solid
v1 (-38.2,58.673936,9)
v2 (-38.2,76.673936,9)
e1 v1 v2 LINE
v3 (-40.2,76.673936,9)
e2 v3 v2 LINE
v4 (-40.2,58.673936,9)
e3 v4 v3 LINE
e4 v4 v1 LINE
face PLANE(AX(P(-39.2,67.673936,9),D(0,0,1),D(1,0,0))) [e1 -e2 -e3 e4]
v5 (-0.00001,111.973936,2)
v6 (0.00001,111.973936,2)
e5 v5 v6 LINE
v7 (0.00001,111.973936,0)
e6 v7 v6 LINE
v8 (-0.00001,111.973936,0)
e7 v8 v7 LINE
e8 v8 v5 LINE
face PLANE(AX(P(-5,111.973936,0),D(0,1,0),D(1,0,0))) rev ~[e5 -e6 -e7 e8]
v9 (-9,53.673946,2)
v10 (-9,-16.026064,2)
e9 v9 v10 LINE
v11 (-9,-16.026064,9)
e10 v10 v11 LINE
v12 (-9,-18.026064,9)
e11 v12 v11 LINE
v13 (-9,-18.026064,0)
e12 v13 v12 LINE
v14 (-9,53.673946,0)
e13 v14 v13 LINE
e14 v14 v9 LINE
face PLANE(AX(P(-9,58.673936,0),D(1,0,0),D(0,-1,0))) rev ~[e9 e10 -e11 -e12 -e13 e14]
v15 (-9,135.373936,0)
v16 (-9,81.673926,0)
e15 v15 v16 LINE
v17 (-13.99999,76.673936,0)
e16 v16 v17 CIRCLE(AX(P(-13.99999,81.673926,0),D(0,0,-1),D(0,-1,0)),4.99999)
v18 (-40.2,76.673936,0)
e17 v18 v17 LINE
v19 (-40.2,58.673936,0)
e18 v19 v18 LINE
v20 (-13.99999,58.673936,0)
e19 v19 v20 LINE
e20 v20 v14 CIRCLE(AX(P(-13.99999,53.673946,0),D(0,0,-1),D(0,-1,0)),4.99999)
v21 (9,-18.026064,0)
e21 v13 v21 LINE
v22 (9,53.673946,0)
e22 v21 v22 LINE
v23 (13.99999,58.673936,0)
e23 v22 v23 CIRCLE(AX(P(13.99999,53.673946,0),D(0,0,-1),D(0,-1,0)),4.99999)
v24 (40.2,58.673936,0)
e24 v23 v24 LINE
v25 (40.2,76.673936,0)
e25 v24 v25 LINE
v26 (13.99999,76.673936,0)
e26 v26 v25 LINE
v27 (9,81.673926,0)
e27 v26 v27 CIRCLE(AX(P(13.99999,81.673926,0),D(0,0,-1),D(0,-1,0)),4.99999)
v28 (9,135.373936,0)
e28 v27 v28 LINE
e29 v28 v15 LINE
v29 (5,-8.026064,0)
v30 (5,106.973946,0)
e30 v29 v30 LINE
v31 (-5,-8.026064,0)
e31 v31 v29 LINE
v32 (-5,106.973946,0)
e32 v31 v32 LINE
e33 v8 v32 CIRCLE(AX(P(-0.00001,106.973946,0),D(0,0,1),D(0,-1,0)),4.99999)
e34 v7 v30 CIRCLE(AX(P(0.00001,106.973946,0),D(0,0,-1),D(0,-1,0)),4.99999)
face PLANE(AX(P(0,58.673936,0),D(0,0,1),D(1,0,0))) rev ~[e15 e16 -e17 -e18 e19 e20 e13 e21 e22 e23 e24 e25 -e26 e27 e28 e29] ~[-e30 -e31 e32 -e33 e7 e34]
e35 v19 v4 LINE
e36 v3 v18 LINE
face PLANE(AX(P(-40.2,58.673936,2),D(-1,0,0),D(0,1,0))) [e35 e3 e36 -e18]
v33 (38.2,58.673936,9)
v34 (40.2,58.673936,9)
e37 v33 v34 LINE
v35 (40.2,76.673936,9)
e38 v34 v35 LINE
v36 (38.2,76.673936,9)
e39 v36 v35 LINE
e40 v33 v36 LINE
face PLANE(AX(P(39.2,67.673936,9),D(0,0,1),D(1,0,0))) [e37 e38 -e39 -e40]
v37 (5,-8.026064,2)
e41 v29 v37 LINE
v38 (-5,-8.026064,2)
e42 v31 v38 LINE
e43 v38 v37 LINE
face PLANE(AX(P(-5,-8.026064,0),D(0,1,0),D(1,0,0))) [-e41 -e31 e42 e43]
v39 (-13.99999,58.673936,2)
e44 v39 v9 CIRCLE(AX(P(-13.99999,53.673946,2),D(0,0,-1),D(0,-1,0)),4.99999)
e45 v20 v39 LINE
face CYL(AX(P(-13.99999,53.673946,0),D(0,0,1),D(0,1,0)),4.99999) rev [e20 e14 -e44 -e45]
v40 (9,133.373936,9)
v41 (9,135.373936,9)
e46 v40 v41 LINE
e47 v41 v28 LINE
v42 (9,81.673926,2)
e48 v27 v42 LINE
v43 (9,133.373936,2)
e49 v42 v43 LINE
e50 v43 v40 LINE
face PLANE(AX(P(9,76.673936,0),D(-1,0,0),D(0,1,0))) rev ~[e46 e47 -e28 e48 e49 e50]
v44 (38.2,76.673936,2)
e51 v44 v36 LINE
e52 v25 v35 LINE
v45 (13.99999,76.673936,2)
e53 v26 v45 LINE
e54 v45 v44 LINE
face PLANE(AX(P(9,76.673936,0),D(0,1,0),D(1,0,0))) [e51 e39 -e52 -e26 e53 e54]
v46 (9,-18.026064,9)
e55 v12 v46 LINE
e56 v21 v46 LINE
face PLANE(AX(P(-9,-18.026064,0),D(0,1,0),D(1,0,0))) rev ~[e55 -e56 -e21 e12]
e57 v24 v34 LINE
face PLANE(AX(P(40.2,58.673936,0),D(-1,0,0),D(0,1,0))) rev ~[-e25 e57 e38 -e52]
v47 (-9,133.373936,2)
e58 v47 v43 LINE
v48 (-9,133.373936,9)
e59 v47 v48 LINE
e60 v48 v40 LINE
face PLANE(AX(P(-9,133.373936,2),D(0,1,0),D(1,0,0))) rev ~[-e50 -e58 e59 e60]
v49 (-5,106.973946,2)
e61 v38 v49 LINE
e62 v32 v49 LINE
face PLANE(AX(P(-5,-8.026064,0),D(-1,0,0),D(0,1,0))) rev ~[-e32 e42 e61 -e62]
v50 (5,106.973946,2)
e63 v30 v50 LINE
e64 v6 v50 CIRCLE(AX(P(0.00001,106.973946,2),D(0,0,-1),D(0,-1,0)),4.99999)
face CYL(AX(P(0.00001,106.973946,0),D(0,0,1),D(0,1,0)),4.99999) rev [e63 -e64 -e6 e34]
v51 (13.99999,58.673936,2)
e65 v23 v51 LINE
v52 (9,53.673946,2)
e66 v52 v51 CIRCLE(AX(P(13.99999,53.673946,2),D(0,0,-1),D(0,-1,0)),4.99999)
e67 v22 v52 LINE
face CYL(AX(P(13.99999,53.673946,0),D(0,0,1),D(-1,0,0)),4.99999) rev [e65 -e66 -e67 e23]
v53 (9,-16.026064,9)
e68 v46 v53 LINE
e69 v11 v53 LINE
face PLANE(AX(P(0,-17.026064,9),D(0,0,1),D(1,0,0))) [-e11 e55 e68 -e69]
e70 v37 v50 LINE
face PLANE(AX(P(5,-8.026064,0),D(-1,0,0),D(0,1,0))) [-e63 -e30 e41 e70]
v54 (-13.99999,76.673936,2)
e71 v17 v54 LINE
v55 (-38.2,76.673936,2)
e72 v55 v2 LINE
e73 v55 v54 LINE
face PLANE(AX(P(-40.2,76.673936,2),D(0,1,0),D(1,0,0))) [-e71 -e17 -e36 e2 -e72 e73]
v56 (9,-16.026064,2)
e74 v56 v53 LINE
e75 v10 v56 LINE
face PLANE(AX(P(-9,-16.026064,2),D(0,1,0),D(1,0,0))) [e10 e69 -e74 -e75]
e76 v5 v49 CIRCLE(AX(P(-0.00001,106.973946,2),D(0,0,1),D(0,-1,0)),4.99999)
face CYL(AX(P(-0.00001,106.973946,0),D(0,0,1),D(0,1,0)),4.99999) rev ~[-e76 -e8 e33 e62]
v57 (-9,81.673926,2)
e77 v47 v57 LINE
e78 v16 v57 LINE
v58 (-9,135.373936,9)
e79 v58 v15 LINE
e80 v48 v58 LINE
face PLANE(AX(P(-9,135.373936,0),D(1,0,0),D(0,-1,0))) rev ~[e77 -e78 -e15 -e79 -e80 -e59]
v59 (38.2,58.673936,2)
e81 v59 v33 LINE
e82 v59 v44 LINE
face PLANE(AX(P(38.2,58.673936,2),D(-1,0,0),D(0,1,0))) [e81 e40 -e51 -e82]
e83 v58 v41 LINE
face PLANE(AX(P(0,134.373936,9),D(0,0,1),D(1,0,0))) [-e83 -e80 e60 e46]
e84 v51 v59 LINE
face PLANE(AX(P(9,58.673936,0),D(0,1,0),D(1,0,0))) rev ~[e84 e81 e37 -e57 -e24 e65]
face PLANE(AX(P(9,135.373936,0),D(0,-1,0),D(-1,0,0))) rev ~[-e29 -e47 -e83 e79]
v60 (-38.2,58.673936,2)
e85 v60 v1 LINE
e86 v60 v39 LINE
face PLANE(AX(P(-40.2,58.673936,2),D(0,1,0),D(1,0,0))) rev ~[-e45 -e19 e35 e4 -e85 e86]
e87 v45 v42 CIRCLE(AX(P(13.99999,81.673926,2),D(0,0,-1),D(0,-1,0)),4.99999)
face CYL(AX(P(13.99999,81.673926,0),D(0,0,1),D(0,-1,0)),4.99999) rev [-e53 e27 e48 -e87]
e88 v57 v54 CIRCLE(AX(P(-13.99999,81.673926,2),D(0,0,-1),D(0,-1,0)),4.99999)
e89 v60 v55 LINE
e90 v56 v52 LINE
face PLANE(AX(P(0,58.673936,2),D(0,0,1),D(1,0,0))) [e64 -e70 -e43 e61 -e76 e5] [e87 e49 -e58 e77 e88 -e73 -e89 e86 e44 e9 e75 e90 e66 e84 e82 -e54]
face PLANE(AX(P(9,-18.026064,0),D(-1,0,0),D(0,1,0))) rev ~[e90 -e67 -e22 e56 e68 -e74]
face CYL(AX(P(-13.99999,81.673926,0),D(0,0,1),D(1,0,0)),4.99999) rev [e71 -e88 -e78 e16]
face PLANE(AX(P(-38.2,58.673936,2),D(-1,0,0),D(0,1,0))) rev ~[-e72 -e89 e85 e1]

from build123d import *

# Parameters (mm, degrees)
F0_W     = 10
F0_H     = 120
F0_W_2   = 31.2
F0_H_2   = 18
F1_DEPTH = 2
F3_W     = 2
F3_H     = 18
F3_W_2   = 18
F3_H_2   = 2
F4_DEPTH = 7
F5_R     = 4.99999


# Not quite as in the source:
# - a fillet or chamfer is up to 0.001 mm smaller than in the source, because OpenCascade refuses the exact size


with BuildPart() as f1:
    # F0 (on Top) → F1 (new body)
    with BuildSketch(Plane.XY):
        Polygon((9, 135.3739356415), (-9, 135.3739356415), (-9, 76.6739356415), (-9, 58.6739356415), (-9, -18.0260643585), (9, -18.0260643585), (9, 58.6739356415), (9, 76.6739356415), align=None)
        with Locations((0, 51.9739356415)):
            Rectangle(F0_W, F0_H, mode=Mode.SUBTRACT)
        with Locations((-24.6, 67.6739356415)):
            Rectangle(F0_W_2, F0_H_2)
        with Locations((24.6, 67.6739356415)):
            Rectangle(F0_W_2, F0_H_2)
    extrude(amount=F1_DEPTH)

    # F3 (on face) → F4 (join)
    with BuildSketch(Plane.XY.offset(2)):
        with Locations((-39.2, 67.6739356415)):
            Rectangle(F3_W, F3_H)
        with Locations((39.2, 67.6739356415)):
            Rectangle(F3_W, F3_H)
        with Locations((0, 134.3739356415)):
            Rectangle(F3_W_2, F3_H_2)
        with Locations((0, -17.0260643585)):
            Rectangle(F3_W_2, F3_H_2)
    extrude(amount=F4_DEPTH)

    # F5 (radius 5 in the source; OpenCascade refuses exactly that, so slightly less here)
    f5_edges = [f1.edges().sort_by_distance(p)[0] for p in [
        (-9, 58.673936, 1),
        (9, 58.673936, 1),
        (9, 76.673936, 1),
        (-9, 76.673936, 1),
        (-5, 111.973936, 1),
        (5, 111.973936, 1),
    ]]
    fillet(f5_edges, radius=F5_R)


solid = f1.part
